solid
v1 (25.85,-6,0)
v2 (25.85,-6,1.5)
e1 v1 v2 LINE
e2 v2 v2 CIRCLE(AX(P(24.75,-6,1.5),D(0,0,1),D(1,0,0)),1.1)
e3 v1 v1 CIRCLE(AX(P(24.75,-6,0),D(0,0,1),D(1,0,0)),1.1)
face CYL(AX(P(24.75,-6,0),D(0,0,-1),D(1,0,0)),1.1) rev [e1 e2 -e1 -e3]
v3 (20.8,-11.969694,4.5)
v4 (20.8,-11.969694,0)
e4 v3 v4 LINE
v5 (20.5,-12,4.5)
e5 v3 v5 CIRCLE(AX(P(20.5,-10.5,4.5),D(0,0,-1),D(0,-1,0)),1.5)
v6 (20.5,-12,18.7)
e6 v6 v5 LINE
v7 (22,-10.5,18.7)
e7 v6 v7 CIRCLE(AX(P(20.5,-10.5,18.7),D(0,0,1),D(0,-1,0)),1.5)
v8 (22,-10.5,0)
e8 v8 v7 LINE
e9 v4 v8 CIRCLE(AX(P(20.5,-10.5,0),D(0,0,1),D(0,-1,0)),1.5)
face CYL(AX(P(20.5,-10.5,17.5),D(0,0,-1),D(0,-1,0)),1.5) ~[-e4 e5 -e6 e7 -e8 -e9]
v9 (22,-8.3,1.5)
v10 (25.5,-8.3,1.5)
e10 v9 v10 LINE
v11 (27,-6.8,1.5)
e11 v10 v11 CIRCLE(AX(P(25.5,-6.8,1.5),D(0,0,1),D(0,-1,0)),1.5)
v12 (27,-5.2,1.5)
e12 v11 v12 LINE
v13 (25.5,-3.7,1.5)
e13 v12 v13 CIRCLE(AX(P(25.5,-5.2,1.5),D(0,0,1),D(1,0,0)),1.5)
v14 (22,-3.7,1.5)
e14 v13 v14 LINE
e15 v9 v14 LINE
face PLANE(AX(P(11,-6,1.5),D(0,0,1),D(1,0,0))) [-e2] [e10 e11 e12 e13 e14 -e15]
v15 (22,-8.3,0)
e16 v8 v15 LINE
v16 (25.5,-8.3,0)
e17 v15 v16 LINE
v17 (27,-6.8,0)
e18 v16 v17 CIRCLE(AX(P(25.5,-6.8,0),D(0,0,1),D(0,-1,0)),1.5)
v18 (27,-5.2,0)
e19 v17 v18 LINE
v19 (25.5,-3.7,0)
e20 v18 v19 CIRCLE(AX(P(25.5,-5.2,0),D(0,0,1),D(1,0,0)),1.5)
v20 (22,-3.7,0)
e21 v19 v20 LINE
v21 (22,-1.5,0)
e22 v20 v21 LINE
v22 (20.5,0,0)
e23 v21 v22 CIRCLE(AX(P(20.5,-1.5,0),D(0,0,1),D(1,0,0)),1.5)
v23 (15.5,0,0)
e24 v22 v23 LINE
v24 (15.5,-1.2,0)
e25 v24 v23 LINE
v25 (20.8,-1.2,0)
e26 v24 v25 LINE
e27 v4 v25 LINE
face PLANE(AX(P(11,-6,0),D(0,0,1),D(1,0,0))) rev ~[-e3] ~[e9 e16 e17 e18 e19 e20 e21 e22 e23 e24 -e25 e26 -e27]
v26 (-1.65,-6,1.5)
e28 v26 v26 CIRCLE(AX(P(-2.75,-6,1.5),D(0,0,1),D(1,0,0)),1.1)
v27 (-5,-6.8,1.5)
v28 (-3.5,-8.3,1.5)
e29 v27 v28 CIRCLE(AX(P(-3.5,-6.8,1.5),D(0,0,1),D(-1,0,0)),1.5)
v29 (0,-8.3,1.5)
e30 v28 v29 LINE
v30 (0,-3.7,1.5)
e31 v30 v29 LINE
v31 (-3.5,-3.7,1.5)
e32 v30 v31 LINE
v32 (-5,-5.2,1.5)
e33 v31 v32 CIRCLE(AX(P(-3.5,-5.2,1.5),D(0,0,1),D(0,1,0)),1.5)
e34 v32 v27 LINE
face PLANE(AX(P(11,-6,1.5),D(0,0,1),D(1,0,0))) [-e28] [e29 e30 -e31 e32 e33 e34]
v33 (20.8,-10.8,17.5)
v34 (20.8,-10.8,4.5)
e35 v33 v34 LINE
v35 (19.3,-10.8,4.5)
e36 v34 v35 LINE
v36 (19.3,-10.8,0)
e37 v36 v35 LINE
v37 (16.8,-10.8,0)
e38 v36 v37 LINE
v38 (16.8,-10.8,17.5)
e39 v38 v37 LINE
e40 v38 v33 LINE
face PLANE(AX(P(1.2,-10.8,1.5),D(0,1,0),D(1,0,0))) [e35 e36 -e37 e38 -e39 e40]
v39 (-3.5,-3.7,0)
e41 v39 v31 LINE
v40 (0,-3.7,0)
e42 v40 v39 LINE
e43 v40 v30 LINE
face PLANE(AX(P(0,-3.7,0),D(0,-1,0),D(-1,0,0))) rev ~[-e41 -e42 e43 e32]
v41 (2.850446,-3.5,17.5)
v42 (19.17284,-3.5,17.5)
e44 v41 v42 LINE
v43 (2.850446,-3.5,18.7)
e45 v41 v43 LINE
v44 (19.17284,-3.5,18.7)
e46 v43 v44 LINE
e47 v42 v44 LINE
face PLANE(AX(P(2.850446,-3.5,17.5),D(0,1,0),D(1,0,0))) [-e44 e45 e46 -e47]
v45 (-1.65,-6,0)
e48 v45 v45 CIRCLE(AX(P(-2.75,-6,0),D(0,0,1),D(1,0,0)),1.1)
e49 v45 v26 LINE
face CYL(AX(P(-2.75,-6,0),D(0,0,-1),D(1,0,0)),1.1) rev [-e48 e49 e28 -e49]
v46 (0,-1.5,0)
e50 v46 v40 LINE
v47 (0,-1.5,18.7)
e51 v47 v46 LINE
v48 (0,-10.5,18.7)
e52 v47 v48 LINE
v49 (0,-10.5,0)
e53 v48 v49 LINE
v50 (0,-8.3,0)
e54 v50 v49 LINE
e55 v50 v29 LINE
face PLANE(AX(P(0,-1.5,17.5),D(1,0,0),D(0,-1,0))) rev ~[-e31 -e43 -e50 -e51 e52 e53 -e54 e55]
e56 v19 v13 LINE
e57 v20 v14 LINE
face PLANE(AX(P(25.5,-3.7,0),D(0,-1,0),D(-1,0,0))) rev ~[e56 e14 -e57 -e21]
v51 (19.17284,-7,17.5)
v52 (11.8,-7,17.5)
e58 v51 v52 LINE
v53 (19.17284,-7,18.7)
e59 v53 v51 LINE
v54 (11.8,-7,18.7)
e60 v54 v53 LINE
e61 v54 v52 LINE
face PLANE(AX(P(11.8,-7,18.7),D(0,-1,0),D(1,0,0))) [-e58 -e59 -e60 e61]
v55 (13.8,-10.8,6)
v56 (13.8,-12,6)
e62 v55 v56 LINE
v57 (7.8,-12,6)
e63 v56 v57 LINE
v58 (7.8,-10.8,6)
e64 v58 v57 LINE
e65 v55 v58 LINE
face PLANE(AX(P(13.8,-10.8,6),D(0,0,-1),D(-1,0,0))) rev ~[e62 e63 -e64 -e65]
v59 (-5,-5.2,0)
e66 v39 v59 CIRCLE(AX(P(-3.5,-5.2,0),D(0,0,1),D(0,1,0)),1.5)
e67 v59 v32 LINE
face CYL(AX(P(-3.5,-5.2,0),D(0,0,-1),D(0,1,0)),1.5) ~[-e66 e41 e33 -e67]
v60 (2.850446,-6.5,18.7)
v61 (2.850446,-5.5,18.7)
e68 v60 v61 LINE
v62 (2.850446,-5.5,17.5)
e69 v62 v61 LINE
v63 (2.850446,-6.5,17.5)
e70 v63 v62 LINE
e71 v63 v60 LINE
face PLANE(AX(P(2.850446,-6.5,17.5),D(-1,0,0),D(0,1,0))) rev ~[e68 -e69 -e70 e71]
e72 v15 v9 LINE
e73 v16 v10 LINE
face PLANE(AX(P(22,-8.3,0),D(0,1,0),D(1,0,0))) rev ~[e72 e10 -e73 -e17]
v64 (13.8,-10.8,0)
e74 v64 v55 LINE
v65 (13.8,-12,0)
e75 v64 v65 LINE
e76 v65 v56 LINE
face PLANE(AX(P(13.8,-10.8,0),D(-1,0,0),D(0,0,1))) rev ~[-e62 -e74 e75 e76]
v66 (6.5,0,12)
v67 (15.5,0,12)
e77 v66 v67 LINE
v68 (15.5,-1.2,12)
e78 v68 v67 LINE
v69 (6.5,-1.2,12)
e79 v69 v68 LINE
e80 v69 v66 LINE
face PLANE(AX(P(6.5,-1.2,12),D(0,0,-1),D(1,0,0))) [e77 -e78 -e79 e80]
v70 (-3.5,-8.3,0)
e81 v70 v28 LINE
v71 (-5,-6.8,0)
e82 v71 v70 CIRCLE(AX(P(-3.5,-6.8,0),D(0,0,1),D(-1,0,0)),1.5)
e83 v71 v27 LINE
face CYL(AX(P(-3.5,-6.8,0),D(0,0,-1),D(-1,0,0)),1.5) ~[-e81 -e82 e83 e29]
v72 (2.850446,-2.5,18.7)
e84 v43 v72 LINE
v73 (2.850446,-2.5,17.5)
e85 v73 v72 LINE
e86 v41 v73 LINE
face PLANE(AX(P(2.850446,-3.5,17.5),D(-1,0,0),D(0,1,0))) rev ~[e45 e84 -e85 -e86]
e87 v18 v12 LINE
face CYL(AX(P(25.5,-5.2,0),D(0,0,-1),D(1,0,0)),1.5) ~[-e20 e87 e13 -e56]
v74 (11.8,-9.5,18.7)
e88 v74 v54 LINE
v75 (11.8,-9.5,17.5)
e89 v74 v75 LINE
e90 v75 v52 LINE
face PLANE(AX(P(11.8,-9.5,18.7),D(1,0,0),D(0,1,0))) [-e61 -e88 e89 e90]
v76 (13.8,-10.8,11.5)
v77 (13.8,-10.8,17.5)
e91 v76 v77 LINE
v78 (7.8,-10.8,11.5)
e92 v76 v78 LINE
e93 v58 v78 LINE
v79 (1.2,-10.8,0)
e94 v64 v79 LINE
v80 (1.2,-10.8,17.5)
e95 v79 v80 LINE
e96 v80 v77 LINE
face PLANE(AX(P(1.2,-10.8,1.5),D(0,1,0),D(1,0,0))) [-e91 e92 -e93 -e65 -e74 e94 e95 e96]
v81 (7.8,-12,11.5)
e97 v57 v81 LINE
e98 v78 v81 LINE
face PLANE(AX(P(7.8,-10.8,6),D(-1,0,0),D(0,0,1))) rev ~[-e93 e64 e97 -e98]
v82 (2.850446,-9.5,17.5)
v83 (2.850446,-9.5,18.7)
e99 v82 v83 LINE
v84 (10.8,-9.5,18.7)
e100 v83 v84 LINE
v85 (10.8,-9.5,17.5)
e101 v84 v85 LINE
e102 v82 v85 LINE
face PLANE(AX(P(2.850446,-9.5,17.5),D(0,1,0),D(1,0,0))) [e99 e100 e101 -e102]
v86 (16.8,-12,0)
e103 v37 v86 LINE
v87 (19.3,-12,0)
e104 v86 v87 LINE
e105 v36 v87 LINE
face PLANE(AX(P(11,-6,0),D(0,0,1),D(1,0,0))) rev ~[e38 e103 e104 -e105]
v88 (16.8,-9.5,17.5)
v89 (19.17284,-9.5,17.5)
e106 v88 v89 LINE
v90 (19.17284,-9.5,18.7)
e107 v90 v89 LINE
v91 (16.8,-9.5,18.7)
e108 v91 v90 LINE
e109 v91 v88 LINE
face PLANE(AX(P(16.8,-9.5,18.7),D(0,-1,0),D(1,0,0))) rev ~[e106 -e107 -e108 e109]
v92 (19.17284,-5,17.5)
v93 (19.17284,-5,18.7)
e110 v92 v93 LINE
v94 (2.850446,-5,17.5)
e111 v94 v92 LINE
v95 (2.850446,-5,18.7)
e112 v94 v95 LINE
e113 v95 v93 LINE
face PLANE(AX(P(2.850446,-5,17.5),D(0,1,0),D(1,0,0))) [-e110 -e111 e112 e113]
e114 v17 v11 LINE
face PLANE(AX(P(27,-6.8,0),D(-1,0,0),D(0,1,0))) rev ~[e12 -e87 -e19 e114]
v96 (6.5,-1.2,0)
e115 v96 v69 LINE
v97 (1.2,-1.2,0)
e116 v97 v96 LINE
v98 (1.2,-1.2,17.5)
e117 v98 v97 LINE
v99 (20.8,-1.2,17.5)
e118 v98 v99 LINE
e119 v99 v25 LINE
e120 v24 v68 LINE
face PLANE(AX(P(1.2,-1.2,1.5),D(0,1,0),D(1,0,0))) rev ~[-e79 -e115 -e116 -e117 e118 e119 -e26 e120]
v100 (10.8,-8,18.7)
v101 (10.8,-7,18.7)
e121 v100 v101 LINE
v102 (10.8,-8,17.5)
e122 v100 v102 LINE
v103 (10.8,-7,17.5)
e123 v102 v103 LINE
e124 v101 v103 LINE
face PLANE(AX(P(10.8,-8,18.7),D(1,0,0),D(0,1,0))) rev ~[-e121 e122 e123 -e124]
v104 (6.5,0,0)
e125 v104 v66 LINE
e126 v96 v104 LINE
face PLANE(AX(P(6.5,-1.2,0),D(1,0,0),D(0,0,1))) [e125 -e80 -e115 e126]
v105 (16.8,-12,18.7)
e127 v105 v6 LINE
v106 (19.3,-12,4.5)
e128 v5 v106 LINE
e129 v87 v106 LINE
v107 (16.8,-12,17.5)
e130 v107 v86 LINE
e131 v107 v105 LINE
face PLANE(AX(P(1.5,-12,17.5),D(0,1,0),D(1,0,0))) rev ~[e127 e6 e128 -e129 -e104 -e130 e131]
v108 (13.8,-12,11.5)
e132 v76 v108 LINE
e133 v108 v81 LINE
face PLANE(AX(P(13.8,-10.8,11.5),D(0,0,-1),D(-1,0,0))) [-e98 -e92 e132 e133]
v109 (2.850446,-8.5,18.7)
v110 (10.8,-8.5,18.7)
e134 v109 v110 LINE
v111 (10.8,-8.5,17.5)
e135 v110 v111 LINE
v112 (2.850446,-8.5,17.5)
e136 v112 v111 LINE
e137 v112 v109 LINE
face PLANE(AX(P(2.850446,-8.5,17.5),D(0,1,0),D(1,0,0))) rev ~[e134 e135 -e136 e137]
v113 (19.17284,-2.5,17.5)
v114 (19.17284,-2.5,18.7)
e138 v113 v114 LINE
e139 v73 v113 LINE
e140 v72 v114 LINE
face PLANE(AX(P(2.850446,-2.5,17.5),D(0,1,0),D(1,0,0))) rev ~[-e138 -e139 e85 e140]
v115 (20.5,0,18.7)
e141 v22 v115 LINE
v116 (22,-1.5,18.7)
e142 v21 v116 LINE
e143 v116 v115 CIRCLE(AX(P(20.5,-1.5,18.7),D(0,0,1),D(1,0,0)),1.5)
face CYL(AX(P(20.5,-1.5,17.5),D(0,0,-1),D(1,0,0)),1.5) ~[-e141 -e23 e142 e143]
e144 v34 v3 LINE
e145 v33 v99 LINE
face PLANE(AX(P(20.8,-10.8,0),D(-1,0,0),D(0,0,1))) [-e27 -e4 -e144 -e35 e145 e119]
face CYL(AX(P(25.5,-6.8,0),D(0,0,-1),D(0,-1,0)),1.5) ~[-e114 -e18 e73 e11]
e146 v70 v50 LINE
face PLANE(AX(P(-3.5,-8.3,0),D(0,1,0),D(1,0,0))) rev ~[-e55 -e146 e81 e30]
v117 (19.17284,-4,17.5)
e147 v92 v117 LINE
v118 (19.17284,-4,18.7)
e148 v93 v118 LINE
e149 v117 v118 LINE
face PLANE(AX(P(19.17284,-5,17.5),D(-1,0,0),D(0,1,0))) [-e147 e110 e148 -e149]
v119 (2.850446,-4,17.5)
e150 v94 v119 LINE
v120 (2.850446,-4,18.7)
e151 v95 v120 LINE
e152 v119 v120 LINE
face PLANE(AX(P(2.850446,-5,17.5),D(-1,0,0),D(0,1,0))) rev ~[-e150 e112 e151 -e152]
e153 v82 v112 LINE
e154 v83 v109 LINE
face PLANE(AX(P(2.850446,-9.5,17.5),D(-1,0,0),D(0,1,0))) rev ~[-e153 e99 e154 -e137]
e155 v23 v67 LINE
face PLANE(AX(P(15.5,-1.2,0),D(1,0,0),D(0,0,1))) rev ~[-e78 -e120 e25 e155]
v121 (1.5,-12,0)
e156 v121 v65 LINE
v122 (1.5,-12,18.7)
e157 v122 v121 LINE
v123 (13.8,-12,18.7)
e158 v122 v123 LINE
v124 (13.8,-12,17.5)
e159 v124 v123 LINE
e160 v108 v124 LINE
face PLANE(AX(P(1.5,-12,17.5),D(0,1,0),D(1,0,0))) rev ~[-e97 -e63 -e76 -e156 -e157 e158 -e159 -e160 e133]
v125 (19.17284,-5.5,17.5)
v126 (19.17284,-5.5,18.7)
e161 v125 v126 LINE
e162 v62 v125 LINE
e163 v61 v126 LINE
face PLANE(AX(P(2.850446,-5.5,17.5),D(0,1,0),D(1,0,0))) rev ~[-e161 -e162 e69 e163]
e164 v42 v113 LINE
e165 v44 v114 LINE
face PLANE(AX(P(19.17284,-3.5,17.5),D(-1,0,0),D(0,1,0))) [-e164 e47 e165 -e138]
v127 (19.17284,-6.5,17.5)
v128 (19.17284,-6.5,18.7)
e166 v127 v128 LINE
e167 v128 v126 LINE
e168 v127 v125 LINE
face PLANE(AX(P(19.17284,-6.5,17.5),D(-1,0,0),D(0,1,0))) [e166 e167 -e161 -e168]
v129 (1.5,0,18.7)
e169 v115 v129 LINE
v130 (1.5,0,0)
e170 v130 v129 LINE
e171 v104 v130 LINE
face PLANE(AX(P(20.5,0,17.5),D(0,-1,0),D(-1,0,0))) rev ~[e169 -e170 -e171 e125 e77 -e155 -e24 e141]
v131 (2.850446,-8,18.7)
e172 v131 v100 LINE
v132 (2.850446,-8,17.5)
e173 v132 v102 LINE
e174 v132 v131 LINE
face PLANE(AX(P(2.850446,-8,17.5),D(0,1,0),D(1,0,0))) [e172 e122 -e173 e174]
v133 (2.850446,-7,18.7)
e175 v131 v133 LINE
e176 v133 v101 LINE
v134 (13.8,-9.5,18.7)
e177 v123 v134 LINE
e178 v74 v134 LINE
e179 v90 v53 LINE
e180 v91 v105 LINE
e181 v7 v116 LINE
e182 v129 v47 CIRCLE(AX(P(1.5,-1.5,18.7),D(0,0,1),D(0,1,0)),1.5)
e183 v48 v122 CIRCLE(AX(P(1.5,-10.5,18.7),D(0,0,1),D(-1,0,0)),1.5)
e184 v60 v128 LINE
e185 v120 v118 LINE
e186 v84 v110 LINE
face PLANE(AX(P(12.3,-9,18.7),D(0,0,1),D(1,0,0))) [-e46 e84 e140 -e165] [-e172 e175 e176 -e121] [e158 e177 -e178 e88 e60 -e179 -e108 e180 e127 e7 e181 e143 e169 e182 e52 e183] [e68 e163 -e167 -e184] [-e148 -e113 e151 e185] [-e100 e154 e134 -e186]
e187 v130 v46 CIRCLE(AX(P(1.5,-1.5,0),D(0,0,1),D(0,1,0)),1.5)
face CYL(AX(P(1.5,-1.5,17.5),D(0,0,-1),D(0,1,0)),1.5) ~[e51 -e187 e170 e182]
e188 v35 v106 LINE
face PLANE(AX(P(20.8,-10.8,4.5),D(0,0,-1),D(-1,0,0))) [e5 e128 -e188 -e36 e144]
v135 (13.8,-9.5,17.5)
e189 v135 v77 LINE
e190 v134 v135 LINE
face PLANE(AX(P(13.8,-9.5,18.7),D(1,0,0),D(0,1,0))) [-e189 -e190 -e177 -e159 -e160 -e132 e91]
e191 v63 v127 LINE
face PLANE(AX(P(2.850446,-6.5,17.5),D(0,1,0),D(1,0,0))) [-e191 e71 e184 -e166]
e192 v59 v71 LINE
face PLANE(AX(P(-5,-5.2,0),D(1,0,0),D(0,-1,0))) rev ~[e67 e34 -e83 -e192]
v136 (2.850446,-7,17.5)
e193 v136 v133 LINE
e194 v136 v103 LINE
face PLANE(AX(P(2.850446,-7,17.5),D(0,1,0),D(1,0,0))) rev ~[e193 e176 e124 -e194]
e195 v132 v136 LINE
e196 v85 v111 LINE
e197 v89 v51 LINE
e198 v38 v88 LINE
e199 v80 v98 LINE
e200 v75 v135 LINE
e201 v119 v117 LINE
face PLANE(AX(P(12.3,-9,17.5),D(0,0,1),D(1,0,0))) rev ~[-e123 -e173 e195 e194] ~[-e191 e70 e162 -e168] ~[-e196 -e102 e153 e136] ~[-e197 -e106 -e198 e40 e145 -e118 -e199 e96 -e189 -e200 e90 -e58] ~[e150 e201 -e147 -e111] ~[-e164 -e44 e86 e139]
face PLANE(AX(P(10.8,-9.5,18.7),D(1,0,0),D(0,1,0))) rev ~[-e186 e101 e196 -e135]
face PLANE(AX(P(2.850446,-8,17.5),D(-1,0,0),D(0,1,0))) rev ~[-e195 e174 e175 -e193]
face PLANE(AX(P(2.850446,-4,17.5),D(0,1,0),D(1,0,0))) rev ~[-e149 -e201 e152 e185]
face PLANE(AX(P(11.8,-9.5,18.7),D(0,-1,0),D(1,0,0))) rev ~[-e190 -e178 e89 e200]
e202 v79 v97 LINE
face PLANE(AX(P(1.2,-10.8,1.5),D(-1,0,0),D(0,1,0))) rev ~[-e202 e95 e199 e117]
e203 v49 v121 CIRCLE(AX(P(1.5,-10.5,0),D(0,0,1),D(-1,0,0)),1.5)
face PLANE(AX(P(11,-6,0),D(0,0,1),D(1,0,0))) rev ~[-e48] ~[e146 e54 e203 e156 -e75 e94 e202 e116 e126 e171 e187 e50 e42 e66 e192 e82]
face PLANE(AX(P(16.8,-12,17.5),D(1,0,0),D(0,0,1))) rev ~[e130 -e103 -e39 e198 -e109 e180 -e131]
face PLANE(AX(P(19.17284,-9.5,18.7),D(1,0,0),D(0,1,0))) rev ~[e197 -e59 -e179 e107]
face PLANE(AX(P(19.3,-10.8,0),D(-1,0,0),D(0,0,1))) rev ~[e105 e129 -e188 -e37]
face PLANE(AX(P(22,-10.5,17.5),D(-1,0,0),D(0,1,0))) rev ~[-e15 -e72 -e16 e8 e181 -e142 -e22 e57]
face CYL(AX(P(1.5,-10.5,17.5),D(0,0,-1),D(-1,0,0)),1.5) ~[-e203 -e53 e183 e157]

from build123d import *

# Parameters (mm, degrees)
F0_R      = 1.1
F1_DEPTH  = 1.5
F2_W      = 19.6000001132
F2_H      = 9.6000001132
F3_DEPTH  = 16
F4_W      = 1.5
F4_H      = 4.5
F4_W_2    = 6
F4_H_2    = 5.5
F5_DEPTH  = 1.2
F6_W      = 9
F6_H      = 12
F7_DEPTH  = 25
F8_W      = 16.3223941345
F8_H      = 1
F9_DEPTH  = 1.2
F10_W     = 3
F10_H     = 1.2
F11_DEPTH = 4
F12_W     = 3
F12_H     = 1
F12_W_2   = 2.3728397638
F13_DEPTH = 1.2
F14_W     = 2
F14_H     = 2.5
F14_W_2   = 2.3728397638
F15_DEPTH = 1.2


# Not quite as in the source:
# - a feature names something its author has since deleted; it is built from what else it names


with BuildPart() as f1:
    # F0 (on Top) → F1 (new body)
    with BuildSketch(Plane.XY):
        with BuildLine():
            Line((20.5, 0), (1.5, 0))
            ThreePointArc((1.5, 0), (0.4393398282, -0.4393398282), (0, -1.5))
            Line((0, -1.5), (0, -3.7))
            Line((0, -3.7), (0, -8.3))
            Line((0, -8.3), (0, -10.5))
            ThreePointArc((0, -10.5), (0.4393398282, -11.5606601718), (1.5, -12))
            Line((1.5, -12), (20.5, -12))
            ThreePointArc((20.5, -12), (21.5606601718, -11.5606601718), (22, -10.5))
            Line((22, -10.5), (22, -8.3))
            Line((22, -8.3), (22, -3.7))
            Line((22, -3.7), (22, -1.5))
            ThreePointArc((22, -1.5), (21.5606601718, -0.4393398282), (20.5, 0))
        make_face()
        Polygon((20.8000000566, -1.1999999434), (20.8000000566, -1.5), (20.8000000566, -10.5), (20.8000000566, -10.8000000566), (20.5, -10.8000000566), (1.5, -10.8000000566), (1.1999999434, -10.8000000566), (1.1999999434, -10.5), (1.1999999434, -1.5), (1.1999999434, -1.1999999434), (1.5, -1.1999999434), (20.5, -1.1999999434), align=None, mode=Mode.SUBTRACT)
        with BuildLine():
            Line((0, -8.3), (0, -3.7))
            Line((0, -3.7), (-3.5, -3.7))
            ThreePointArc((-3.5, -3.7), (-4.5606601718, -4.1393398282), (-5, -5.2))
            Line((-5, -5.2), (-5, -6.8))
            ThreePointArc((-5, -6.8), (-4.5606601718, -7.8606601718), (-3.5, -8.3))
            Line((-3.5, -8.3), (0, -8.3))
        make_face()
        with Locations((-2.75, -6)):
            Circle(F0_R, mode=Mode.SUBTRACT)
        with BuildLine():
            Line((25.5, -3.7), (22, -3.7))
            Line((22, -3.7), (22, -8.3))
            Line((22, -8.3), (25.5, -8.3))
            ThreePointArc((25.5, -8.3), (26.5606601718, -7.8606601718), (27, -6.8))
            Line((27, -6.8), (27, -5.2))
            ThreePointArc((27, -5.2), (26.5606601718, -4.1393398282), (25.5, -3.7))
        make_face()
        with Locations((24.75, -6)):
            Circle(F0_R, mode=Mode.SUBTRACT)
    extrude(amount=F1_DEPTH)

    # F2 (on face) → F3 (join)
    with BuildSketch(Plane.XY.offset(1.5)):
        with BuildLine():
            Line((22, -10.5), (22, -8.3))
            Line((22, -8.3), (22, -3.7))
            Line((22, -3.7), (22, -1.5))
            ThreePointArc((22, -1.5), (21.5606601718, -0.4393398282), (20.5, 0))
            Line((20.5, 0), (1.5, 0))
            ThreePointArc((1.5, 0), (0.4393398282, -0.4393398282), (0, -1.5))
            Line((0, -1.5), (0, -3.7))
            Line((0, -3.7), (0, -8.3))
            Line((0, -8.3), (0, -10.5))
            ThreePointArc((0, -10.5), (0.4393398282, -11.5606601718), (1.5, -12))
            Line((1.5, -12), (20.5, -12))
            ThreePointArc((20.5, -12), (21.5606601718, -11.5606601718), (22, -10.5))
        make_face()
        with Locations((11, -6)):
            Rectangle(F2_W, F2_H, mode=Mode.SUBTRACT)
    extrude(amount=F3_DEPTH)

    # F4 (on face) → F5 (cut)
    with BuildSketch(Plane(origin=(0, -10.8000000566, 0), x_dir=(-1, 0, 0), z_dir=(0, 1, 0))):
        with Locations((-20.0500000566, 2.25)):
            Rectangle(F4_W, F4_H)
        Polygon((-16.8000000566, 17.5), (-16.8000000566, 0), (-13.8000000566, 0), (-13.8000000566, 6), (-13.8000000566, 11.5), (-13.8000000566, 17.5), align=None)
        with Locations((-10.8000000566, 8.75)):
            Rectangle(F4_W_2, F4_H_2)
    extrude(amount=-F5_DEPTH, mode=Mode.SUBTRACT)

    # F6 (on face) → F7 (cut)
    with BuildSketch(Plane.XZ.offset(1.1999999434)):
        with Locations((10.9999999434, 6)):
            Rectangle(F6_W, F6_H)
    extrude(amount=-F7_DEPTH, mode=Mode.SUBTRACT)

    # F8 (on face) → F9 (join)
    with BuildSketch(Plane.XY.offset(17.5)):
        with BuildLine():
            Line((16.8000000566, -10.8000000566), (16.8000000566, -12.0000000566))
            Line((16.8000000566, -12), (20.5, -12))
            ThreePointArc((20.5, -12), (21.5606601718, -11.5606601718), (22, -10.5))
            Line((22, -10.5), (22, -1.5))
            ThreePointArc((22, -1.5), (21.5606601718, -0.4393398282), (20.5, 0))
            Line((20.5, 0), (1.5, 0))
            ThreePointArc((1.5, 0), (0.4393398282, -0.4393398282), (0, -1.5))
            Line((0, -1.5), (0, -10.5))
            ThreePointArc((0, -10.5), (0.4393398282, -11.5606601718), (1.5, -12))
            Line((1.5, -12), (13.8000000566, -12))
            Line((13.8000000566, -12.0000000566), (13.8000000566, -10.8000000566))
            Line((13.8000000566, -10.8000000566), (1.1999999434, -10.8000000566))
            Line((1.1999999434, -10.8000000566), (1.1999999434, -1.1999999434))
            Line((1.1999999434, -1.1999999434), (20.8000000566, -1.1999999434))
            Line((20.8000000566, -1.1999999434), (20.8000000566, -10.8000000566))
            Line((20.8000000566, -10.8000000566), (16.8000000566, -10.8000000566))
        make_face()
        Polygon((13.8000000566, -12), (16.8000000566, -12), (16.8000000566, -10.8000000566), (20.8000000566, -10.8000000566), (20.8000000566, -1.1999999434), (1.1999999434, -1.1999999434), (1.1999999434, -10.8000000566), (13.8000000566, -10.8000000566), align=None)
        with Locations((11.0116427531, -9)):
            Rectangle(F8_W, F8_H, mode=Mode.SUBTRACT)
        with Locations((11.0116427531, -7.5)):
            Rectangle(F8_W, F8_H, mode=Mode.SUBTRACT)
        with Locations((11.0116427531, -6)):
            Rectangle(F8_W, F8_H, mode=Mode.SUBTRACT)
        with Locations((11.0116427531, -4.5)):
            Rectangle(F8_W, F8_H, mode=Mode.SUBTRACT)
        with Locations((11.0116427531, -3)):
            Rectangle(F8_W, F8_H, mode=Mode.SUBTRACT)
    extrude(amount=F9_DEPTH)

    # F10 (on face) → F11 (cut)
    with BuildSketch(Plane.XZ.offset(12)):
        with Locations((15.3000000566, 18.1)):
            Rectangle(F10_W, F10_H)
    extrude(amount=-F11_DEPTH, mode=Mode.SUBTRACT)

    # F12 (on face) → F13 (join)
    with BuildSketch(Plane.XY.offset(18.7)):
        with Locations((12.3000000566, -9)):
            Rectangle(F12_W, F12_H)
        with Locations((12.3000000566, -7.5)):
            Rectangle(F12_W, F12_H)
        with Locations((17.9864199385, -7.5)):
            Rectangle(F12_W_2, F12_H)
        with Locations((17.9864199385, -9)):
            Rectangle(F12_W_2, F12_H)
    extrude(amount=-F13_DEPTH)

    # F14 (on face) → F15 (cut)
    with BuildSketch(Plane.XY.offset(18.7)):
        with Locations((12.8000000566, -8.25)):
            Rectangle(F14_W, F14_H)
        with Locations((17.9864199385, -8.25)):
            Rectangle(F14_W_2, F14_H)
    extrude(amount=-F15_DEPTH, mode=Mode.SUBTRACT)


solid = f1.part
